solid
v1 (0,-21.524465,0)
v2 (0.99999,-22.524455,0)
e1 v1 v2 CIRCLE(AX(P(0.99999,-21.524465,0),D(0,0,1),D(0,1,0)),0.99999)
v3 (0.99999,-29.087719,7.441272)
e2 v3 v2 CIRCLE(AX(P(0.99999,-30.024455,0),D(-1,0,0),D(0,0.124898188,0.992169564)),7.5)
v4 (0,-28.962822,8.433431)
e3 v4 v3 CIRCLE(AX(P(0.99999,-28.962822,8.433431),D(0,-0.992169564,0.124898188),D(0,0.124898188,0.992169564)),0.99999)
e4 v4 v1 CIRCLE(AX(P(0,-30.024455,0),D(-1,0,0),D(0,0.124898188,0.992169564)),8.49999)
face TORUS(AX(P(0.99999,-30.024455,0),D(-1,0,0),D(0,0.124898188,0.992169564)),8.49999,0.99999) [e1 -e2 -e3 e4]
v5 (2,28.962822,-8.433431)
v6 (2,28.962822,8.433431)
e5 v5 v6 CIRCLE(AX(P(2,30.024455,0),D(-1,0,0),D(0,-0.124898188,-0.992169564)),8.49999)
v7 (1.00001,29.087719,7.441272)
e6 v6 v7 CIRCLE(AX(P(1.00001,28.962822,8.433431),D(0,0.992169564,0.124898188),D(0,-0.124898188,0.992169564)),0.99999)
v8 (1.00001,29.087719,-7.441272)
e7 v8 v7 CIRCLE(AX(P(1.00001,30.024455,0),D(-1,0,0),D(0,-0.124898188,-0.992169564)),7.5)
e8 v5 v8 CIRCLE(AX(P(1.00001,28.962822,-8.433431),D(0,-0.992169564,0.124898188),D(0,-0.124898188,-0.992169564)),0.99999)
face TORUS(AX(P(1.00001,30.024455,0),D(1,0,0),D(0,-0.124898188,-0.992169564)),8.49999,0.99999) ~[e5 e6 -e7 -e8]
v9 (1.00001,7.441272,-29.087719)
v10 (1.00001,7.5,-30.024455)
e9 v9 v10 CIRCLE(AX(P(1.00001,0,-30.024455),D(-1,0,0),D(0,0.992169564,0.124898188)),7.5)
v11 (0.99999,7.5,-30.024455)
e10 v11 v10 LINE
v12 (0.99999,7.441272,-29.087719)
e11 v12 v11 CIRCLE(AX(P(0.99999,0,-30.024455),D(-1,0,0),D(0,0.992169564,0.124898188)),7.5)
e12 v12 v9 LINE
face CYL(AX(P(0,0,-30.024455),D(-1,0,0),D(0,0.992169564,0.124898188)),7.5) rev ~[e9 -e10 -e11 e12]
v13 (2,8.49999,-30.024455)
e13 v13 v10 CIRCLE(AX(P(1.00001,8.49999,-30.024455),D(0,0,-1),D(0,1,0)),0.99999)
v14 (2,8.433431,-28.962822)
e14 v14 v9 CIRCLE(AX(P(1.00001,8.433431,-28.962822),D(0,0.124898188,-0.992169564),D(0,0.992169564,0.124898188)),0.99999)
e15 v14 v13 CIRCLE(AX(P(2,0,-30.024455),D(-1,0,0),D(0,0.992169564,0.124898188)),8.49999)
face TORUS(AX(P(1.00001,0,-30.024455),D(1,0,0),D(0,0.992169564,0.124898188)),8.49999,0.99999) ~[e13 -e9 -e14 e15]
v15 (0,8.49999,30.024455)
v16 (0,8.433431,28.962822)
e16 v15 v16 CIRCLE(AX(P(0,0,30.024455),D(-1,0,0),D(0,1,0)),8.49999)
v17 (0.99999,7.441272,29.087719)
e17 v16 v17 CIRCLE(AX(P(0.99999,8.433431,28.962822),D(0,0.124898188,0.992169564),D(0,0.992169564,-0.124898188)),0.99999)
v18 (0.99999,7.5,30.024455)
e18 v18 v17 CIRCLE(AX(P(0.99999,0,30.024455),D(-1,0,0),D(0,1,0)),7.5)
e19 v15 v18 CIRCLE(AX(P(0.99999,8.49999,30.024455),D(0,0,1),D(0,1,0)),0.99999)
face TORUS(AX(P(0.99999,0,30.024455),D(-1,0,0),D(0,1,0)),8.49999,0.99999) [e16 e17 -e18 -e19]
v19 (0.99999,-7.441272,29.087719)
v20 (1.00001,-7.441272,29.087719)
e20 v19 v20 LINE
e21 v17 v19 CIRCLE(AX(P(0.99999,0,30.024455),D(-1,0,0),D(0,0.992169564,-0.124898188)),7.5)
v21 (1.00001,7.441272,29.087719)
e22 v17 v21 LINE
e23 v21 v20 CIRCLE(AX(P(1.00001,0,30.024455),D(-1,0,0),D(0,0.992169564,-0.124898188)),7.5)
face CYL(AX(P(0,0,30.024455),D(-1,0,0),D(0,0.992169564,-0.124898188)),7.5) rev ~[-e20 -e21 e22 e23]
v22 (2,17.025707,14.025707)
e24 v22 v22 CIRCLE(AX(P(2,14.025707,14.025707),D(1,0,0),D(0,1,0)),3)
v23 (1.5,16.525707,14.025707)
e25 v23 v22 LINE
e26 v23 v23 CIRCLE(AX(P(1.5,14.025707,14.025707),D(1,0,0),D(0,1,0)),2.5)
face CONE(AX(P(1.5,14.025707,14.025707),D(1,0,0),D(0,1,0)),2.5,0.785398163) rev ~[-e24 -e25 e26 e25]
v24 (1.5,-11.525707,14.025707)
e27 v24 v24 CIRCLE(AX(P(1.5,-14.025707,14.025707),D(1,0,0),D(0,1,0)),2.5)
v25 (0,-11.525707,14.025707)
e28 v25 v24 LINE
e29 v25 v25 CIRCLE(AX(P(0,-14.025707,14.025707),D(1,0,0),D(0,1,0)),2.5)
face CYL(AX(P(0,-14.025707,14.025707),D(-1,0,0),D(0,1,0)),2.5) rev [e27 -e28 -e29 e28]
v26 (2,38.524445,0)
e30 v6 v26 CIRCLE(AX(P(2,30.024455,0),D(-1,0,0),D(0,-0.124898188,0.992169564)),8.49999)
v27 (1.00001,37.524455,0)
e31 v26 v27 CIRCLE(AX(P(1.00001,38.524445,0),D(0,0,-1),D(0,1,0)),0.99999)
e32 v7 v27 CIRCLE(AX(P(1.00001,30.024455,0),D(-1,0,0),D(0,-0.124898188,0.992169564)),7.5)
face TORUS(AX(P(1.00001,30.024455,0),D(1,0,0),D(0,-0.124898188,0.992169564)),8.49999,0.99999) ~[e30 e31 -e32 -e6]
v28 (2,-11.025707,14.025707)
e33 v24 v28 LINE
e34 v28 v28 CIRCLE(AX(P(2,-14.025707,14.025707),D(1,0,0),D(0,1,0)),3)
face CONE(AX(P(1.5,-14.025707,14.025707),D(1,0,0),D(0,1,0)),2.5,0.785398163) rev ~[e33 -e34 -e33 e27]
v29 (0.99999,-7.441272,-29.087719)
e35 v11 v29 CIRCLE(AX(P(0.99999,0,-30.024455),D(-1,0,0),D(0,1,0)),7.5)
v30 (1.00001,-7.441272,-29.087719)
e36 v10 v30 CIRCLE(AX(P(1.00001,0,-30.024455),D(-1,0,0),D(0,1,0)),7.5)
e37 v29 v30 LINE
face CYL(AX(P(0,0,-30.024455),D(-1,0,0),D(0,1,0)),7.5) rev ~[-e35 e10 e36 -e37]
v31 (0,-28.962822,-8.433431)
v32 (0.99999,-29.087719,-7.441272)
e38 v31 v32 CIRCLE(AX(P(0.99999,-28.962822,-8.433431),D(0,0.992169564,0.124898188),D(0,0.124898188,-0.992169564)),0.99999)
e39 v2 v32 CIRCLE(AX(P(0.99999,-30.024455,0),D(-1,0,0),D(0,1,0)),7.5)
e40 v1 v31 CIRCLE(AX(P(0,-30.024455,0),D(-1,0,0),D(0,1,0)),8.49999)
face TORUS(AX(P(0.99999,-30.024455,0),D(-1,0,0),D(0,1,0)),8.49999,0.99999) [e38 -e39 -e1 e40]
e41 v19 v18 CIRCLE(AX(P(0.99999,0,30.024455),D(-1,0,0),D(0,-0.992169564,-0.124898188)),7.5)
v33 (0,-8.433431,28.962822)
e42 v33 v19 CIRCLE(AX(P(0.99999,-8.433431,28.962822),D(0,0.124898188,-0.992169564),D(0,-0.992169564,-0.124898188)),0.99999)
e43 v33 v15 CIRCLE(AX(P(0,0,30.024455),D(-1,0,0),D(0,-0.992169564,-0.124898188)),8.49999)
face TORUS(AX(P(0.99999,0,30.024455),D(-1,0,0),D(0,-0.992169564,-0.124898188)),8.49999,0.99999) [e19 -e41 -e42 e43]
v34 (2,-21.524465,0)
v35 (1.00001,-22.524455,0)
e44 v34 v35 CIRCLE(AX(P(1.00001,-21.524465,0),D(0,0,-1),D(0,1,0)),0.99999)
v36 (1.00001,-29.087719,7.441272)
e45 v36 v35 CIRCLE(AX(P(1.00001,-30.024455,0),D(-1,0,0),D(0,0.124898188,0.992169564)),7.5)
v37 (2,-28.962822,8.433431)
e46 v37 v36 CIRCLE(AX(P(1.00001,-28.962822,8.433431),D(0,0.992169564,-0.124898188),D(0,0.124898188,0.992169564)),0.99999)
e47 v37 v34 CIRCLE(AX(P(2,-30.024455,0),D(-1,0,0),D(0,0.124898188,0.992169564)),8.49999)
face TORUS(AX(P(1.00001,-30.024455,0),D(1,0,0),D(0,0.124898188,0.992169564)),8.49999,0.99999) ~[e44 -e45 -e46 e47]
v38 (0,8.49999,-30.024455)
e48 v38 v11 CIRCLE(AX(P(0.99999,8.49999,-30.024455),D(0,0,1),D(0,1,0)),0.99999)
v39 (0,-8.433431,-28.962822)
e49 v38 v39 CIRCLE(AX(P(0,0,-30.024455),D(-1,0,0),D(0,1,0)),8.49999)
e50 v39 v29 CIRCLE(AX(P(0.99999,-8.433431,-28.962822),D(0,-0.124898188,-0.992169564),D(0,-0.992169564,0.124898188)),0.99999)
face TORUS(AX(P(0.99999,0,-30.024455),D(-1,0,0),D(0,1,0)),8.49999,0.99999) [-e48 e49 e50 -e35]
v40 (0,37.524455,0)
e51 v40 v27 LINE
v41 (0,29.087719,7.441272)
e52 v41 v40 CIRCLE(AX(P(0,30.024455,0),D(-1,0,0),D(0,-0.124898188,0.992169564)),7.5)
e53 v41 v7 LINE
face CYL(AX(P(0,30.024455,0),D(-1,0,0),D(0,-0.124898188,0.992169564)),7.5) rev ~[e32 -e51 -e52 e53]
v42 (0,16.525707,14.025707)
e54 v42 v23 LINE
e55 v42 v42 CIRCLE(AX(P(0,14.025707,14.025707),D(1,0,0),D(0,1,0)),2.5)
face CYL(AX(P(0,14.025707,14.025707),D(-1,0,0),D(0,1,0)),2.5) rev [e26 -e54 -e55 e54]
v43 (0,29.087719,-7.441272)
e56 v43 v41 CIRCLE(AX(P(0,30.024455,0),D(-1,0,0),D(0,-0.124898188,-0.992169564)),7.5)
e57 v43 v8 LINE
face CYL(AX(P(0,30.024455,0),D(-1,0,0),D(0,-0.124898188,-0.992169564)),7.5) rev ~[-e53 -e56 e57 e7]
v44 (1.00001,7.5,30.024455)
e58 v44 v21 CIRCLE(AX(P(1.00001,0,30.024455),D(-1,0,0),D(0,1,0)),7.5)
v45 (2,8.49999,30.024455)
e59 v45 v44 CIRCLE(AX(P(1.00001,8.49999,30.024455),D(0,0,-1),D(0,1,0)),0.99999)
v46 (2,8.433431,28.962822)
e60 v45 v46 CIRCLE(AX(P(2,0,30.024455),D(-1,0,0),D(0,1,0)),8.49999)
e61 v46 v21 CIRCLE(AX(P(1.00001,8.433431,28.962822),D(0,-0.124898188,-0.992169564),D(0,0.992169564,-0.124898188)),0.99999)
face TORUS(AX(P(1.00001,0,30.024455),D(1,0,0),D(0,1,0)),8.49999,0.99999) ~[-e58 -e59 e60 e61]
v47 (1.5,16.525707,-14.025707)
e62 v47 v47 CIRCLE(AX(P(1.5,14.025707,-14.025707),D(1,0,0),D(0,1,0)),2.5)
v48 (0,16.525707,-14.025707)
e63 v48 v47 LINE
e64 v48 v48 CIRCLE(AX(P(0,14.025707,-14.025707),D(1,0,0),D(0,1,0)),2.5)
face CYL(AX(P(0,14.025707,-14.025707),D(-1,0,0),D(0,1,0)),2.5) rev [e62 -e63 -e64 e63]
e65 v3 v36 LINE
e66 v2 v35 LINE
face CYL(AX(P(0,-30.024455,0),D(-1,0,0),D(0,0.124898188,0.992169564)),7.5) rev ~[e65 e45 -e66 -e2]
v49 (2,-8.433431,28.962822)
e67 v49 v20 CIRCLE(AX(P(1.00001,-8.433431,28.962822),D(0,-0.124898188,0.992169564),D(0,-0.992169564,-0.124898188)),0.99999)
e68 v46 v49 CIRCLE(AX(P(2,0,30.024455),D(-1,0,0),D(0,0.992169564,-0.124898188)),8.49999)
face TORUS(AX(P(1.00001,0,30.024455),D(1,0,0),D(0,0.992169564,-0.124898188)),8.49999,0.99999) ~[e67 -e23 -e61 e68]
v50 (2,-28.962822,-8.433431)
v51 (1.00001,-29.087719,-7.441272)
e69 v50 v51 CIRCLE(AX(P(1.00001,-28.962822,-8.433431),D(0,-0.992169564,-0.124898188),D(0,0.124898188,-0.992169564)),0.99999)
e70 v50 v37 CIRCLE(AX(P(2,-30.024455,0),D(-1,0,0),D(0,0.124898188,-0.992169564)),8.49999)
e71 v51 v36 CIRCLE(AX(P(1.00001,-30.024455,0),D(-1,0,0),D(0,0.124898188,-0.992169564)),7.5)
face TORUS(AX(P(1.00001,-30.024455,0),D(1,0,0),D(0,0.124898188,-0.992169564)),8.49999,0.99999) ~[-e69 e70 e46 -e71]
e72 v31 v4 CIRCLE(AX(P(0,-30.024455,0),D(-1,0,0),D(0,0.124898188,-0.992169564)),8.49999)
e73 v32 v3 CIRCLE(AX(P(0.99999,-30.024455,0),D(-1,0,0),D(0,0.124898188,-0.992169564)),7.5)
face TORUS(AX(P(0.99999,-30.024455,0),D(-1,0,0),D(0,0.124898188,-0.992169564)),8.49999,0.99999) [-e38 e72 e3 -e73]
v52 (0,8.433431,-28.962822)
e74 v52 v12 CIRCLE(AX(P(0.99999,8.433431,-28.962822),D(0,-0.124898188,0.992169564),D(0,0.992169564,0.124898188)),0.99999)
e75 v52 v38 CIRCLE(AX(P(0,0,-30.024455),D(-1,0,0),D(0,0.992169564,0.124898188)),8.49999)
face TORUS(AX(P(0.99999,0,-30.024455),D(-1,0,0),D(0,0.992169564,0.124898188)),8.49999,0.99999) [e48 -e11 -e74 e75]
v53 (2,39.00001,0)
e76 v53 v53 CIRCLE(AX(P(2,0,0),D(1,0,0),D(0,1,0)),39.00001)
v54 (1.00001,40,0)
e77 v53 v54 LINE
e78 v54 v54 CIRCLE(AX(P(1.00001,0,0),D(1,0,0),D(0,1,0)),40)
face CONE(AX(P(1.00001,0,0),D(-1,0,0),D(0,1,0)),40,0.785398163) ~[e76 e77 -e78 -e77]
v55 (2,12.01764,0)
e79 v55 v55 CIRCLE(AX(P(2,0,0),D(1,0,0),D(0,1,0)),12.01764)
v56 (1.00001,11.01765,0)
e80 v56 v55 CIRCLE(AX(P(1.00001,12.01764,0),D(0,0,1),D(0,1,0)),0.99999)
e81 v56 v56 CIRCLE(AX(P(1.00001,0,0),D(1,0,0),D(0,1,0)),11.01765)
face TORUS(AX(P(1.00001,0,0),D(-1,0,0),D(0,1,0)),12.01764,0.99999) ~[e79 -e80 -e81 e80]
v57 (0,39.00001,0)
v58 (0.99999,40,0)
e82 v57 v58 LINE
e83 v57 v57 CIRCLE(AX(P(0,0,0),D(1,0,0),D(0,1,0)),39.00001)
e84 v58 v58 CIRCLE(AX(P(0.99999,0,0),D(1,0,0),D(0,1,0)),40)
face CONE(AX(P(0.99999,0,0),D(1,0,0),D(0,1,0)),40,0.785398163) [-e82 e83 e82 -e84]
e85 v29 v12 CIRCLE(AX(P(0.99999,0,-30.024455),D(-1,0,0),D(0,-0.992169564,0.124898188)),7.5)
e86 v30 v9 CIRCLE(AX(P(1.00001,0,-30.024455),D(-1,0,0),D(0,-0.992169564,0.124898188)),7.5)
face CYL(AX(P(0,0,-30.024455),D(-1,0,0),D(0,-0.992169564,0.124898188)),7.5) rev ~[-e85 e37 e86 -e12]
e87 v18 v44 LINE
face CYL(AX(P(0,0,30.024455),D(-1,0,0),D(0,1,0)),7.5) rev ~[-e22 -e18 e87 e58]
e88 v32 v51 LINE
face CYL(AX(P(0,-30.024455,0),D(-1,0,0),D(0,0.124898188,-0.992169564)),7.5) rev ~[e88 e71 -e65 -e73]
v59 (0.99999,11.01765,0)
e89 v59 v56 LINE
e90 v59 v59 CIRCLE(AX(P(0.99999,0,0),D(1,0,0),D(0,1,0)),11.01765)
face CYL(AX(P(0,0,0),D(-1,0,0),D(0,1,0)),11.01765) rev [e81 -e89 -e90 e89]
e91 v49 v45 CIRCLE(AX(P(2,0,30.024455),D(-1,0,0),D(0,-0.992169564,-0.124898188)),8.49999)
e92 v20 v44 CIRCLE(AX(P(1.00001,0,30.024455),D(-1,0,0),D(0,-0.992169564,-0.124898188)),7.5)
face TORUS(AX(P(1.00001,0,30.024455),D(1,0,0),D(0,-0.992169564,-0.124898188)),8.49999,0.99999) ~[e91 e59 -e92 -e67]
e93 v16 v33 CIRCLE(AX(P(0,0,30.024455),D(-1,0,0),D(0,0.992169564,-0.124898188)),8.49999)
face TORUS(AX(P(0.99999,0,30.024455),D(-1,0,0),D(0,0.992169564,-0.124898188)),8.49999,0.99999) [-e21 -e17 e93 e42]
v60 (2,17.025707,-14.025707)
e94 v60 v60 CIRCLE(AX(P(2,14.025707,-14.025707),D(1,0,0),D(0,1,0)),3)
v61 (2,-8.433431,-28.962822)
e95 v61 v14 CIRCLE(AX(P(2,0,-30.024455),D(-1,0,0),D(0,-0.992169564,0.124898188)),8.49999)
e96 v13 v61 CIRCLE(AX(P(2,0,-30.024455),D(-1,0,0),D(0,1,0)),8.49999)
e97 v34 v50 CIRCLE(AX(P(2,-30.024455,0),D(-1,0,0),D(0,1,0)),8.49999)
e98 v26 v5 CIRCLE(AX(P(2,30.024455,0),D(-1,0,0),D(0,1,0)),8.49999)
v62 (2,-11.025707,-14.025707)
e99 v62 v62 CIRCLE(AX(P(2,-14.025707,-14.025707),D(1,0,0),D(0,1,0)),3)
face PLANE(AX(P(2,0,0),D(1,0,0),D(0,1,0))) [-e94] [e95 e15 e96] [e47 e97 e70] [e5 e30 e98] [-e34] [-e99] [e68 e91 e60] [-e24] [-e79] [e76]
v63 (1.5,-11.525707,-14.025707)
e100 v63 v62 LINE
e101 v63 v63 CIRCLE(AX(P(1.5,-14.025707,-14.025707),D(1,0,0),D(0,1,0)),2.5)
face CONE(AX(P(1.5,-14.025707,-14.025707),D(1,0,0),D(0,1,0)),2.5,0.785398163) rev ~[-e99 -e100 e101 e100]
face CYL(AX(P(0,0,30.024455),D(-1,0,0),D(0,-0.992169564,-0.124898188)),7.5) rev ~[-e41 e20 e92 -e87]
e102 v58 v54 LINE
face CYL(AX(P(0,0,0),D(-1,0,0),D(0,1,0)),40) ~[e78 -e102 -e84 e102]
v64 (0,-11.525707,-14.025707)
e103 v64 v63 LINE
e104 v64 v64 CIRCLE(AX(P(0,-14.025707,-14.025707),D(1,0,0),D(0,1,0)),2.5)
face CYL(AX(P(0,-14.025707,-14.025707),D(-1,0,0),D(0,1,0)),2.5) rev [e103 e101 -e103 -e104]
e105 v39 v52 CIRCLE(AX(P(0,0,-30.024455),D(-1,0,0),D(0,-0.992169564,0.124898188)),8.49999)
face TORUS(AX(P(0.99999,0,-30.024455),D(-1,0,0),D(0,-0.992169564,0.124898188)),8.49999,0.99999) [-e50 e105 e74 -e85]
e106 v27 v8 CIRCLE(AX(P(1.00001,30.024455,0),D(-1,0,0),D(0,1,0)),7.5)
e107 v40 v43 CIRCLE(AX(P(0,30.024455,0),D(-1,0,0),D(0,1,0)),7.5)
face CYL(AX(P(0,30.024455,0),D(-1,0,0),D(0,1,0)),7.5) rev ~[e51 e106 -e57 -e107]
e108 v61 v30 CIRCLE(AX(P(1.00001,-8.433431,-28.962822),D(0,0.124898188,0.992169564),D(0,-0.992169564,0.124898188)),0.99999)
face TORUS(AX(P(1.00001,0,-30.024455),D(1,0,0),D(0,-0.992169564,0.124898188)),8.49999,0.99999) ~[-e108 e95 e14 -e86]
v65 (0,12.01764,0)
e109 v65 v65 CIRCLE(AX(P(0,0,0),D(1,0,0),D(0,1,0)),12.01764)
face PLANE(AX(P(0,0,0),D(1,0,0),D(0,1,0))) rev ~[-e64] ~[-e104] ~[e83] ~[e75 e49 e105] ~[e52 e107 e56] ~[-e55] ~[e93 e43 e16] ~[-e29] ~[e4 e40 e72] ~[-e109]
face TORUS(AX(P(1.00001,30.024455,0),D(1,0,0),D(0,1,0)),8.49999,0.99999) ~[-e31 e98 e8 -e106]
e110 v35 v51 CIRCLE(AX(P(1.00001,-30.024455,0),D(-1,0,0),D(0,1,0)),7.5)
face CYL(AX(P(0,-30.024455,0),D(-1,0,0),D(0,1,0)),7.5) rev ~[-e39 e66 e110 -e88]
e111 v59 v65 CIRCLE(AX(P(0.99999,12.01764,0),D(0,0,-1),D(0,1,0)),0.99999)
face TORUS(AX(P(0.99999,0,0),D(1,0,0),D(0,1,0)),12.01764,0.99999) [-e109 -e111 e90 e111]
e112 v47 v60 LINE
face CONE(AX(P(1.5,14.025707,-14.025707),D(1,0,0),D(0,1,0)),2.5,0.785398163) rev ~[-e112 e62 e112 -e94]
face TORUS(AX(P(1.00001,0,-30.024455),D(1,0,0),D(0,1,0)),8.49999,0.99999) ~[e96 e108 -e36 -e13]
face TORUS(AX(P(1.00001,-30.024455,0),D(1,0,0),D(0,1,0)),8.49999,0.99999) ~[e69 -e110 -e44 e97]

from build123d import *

# Parameters (mm, degrees)
F0_R     = 40
F0_R_2   = 2.5
F0_R_3   = 11.0176496963
F1_DEPTH = 2
F2_R     = 0.99999
F3_SIZE  = 0.99999
F4_SIZE  = 0.5
F5_R     = 0.99999


# Not quite as in the source:
# - a fillet or chamfer is up to 0.001 mm smaller than in the source, because OpenCascade refuses the exact size


with BuildPart() as f1:
    # F0 (on Right) → F1 (new body)
    with BuildSketch(Plane.YZ):
        Circle(F0_R)
        with BuildLine():
            ThreePointArc((7.4412717263, 29.0877185034), (21.2304956682, 21.2304956682), (29.0877185034, 7.4412717263))
            ThreePointArc((29.0877185034, 7.4412717263), (34.985527221, 5.6247454631), (37.5244549099, 0))
            ThreePointArc((37.5244549099, 0), (34.985527221, -5.6247454631), (29.0877185034, -7.4412717263))
            ThreePointArc((29.0877185034, -7.4412717263), (21.2304956682, -21.2304956682), (7.4412717263, -29.0877185034))
            ThreePointArc((7.4412717263, -29.0877185034), (7.4853035325, -29.5551671236), (7.5, -30.0244549099))
            ThreePointArc((7.5, -30.0244549099), (-0.4692877863, -37.5097584424), (-7.4412717263, -29.0877185034))
            ThreePointArc((-7.4412717263, -29.0877185034), (-21.2304956682, -21.2304956682), (-29.0877185034, -7.4412717263))
            ThreePointArc((-29.0877185034, -7.4412717263), (-37.5244549099, 0), (-29.0877185034, 7.4412717263))
            ThreePointArc((-29.0877185034, 7.4412717263), (-21.2304956682, 21.2304956682), (-7.4412717263, 29.0877185034))
            ThreePointArc((-7.4412717263, 29.0877185034), (-0.4692877863, 37.5097584424), (7.5, 30.0244549099))
            ThreePointArc((7.5, 30.0244549099), (7.4853035325, 29.5551671236), (7.4412717263, 29.0877185034))
        make_face(mode=Mode.SUBTRACT)
        with BuildLine():
            ThreePointArc((29.0877185034, -7.4412717263), (22.5244549099, 0), (29.0877185034, 7.4412717263))
            ThreePointArc((29.0877185034, 7.4412717263), (21.2304956682, 21.2304956682), (7.4412717263, 29.0877185034))
            ThreePointArc((7.4412717263, 29.0877185034), (0, 22.5244549099), (-7.4412717263, 29.0877185034))
            ThreePointArc((-7.4412717263, 29.0877185034), (-21.2304956682, 21.2304956682), (-29.0877185034, 7.4412717263))
            ThreePointArc((-29.0877185034, 7.4412717263), (-24.3997094468, 4.9610723111), (-22.5244549099, 0))
            ThreePointArc((-22.5244549099, 0), (-24.3997094468, -4.9610723111), (-29.0877185034, -7.4412717263))
            ThreePointArc((-29.0877185034, -7.4412717263), (-21.2304956682, -21.2304956682), (-7.4412717263, -29.0877185034))
            ThreePointArc((-7.4412717263, -29.0877185034), (0, -22.5244549099), (7.4412717263, -29.0877185034))
            ThreePointArc((7.4412717263, -29.0877185034), (21.2304956682, -21.2304956682), (29.0877185034, -7.4412717263))
        make_face()
        with Locations((-14.0257067978, -14.0257067978)):
            Circle(F0_R_2, mode=Mode.SUBTRACT)
        with Locations((14.0257067978, -14.0257067978)):
            Circle(F0_R_2, mode=Mode.SUBTRACT)
        with Locations((-14.0257067978, 14.0257067978)):
            Circle(F0_R_2, mode=Mode.SUBTRACT)
        Circle(F0_R_3, mode=Mode.SUBTRACT)
        with Locations((14.0257067978, 14.0257067978)):
            Circle(F0_R_2, mode=Mode.SUBTRACT)
    extrude(amount=F1_DEPTH)

    # F2 (radius 1 in the source; OpenCascade refuses exactly that, so slightly less here)
    f2_edges = [f1.edges().sort_by_distance(p)[0] for p in [
        (0, -11.01765, 0),
        (1, 11.01765, 0),
        (2, -11.01765, 0),
    ]]
    fillet(f2_edges, radius=F2_R)

    # F3 (size 1 in the source; OpenCascade refuses exactly that, so slightly less here)
    f3_edges = [f1.edges().sort_by_distance(p)[0] for p in [
        (0, -40, 0),
        (2, -40, 0),
    ]]
    chamfer(f3_edges, length=F3_SIZE)

    # F4
    f4_edges = [f1.edges().sort_by_distance(p)[0] for p in [
        (2, 11.525707, 14.025707),
        (2, 11.525707, -14.025707),
        (2, -16.525707, -14.025707),
        (2, -16.525707, 14.025707),
    ]]
    chamfer(f4_edges, length=F4_SIZE)

    # F5 (radius 1 in the source; OpenCascade refuses exactly that, so slightly less here)
    f5_edges = [f1.edges().sort_by_distance(p)[0] for p in [
        (2, -7.5, 30.024455),
        (2, 22.524455, 0),
        (2, -7.5, -30.024455),
        (2, -30.961191, -7.441272),
        (0, -30.961191, -7.441272),
        (0, -7.5, 30.024455),
        (0, -7.5, -30.024455),
    ]]
    fillet(f5_edges, radius=F5_R)


solid = f1.part
